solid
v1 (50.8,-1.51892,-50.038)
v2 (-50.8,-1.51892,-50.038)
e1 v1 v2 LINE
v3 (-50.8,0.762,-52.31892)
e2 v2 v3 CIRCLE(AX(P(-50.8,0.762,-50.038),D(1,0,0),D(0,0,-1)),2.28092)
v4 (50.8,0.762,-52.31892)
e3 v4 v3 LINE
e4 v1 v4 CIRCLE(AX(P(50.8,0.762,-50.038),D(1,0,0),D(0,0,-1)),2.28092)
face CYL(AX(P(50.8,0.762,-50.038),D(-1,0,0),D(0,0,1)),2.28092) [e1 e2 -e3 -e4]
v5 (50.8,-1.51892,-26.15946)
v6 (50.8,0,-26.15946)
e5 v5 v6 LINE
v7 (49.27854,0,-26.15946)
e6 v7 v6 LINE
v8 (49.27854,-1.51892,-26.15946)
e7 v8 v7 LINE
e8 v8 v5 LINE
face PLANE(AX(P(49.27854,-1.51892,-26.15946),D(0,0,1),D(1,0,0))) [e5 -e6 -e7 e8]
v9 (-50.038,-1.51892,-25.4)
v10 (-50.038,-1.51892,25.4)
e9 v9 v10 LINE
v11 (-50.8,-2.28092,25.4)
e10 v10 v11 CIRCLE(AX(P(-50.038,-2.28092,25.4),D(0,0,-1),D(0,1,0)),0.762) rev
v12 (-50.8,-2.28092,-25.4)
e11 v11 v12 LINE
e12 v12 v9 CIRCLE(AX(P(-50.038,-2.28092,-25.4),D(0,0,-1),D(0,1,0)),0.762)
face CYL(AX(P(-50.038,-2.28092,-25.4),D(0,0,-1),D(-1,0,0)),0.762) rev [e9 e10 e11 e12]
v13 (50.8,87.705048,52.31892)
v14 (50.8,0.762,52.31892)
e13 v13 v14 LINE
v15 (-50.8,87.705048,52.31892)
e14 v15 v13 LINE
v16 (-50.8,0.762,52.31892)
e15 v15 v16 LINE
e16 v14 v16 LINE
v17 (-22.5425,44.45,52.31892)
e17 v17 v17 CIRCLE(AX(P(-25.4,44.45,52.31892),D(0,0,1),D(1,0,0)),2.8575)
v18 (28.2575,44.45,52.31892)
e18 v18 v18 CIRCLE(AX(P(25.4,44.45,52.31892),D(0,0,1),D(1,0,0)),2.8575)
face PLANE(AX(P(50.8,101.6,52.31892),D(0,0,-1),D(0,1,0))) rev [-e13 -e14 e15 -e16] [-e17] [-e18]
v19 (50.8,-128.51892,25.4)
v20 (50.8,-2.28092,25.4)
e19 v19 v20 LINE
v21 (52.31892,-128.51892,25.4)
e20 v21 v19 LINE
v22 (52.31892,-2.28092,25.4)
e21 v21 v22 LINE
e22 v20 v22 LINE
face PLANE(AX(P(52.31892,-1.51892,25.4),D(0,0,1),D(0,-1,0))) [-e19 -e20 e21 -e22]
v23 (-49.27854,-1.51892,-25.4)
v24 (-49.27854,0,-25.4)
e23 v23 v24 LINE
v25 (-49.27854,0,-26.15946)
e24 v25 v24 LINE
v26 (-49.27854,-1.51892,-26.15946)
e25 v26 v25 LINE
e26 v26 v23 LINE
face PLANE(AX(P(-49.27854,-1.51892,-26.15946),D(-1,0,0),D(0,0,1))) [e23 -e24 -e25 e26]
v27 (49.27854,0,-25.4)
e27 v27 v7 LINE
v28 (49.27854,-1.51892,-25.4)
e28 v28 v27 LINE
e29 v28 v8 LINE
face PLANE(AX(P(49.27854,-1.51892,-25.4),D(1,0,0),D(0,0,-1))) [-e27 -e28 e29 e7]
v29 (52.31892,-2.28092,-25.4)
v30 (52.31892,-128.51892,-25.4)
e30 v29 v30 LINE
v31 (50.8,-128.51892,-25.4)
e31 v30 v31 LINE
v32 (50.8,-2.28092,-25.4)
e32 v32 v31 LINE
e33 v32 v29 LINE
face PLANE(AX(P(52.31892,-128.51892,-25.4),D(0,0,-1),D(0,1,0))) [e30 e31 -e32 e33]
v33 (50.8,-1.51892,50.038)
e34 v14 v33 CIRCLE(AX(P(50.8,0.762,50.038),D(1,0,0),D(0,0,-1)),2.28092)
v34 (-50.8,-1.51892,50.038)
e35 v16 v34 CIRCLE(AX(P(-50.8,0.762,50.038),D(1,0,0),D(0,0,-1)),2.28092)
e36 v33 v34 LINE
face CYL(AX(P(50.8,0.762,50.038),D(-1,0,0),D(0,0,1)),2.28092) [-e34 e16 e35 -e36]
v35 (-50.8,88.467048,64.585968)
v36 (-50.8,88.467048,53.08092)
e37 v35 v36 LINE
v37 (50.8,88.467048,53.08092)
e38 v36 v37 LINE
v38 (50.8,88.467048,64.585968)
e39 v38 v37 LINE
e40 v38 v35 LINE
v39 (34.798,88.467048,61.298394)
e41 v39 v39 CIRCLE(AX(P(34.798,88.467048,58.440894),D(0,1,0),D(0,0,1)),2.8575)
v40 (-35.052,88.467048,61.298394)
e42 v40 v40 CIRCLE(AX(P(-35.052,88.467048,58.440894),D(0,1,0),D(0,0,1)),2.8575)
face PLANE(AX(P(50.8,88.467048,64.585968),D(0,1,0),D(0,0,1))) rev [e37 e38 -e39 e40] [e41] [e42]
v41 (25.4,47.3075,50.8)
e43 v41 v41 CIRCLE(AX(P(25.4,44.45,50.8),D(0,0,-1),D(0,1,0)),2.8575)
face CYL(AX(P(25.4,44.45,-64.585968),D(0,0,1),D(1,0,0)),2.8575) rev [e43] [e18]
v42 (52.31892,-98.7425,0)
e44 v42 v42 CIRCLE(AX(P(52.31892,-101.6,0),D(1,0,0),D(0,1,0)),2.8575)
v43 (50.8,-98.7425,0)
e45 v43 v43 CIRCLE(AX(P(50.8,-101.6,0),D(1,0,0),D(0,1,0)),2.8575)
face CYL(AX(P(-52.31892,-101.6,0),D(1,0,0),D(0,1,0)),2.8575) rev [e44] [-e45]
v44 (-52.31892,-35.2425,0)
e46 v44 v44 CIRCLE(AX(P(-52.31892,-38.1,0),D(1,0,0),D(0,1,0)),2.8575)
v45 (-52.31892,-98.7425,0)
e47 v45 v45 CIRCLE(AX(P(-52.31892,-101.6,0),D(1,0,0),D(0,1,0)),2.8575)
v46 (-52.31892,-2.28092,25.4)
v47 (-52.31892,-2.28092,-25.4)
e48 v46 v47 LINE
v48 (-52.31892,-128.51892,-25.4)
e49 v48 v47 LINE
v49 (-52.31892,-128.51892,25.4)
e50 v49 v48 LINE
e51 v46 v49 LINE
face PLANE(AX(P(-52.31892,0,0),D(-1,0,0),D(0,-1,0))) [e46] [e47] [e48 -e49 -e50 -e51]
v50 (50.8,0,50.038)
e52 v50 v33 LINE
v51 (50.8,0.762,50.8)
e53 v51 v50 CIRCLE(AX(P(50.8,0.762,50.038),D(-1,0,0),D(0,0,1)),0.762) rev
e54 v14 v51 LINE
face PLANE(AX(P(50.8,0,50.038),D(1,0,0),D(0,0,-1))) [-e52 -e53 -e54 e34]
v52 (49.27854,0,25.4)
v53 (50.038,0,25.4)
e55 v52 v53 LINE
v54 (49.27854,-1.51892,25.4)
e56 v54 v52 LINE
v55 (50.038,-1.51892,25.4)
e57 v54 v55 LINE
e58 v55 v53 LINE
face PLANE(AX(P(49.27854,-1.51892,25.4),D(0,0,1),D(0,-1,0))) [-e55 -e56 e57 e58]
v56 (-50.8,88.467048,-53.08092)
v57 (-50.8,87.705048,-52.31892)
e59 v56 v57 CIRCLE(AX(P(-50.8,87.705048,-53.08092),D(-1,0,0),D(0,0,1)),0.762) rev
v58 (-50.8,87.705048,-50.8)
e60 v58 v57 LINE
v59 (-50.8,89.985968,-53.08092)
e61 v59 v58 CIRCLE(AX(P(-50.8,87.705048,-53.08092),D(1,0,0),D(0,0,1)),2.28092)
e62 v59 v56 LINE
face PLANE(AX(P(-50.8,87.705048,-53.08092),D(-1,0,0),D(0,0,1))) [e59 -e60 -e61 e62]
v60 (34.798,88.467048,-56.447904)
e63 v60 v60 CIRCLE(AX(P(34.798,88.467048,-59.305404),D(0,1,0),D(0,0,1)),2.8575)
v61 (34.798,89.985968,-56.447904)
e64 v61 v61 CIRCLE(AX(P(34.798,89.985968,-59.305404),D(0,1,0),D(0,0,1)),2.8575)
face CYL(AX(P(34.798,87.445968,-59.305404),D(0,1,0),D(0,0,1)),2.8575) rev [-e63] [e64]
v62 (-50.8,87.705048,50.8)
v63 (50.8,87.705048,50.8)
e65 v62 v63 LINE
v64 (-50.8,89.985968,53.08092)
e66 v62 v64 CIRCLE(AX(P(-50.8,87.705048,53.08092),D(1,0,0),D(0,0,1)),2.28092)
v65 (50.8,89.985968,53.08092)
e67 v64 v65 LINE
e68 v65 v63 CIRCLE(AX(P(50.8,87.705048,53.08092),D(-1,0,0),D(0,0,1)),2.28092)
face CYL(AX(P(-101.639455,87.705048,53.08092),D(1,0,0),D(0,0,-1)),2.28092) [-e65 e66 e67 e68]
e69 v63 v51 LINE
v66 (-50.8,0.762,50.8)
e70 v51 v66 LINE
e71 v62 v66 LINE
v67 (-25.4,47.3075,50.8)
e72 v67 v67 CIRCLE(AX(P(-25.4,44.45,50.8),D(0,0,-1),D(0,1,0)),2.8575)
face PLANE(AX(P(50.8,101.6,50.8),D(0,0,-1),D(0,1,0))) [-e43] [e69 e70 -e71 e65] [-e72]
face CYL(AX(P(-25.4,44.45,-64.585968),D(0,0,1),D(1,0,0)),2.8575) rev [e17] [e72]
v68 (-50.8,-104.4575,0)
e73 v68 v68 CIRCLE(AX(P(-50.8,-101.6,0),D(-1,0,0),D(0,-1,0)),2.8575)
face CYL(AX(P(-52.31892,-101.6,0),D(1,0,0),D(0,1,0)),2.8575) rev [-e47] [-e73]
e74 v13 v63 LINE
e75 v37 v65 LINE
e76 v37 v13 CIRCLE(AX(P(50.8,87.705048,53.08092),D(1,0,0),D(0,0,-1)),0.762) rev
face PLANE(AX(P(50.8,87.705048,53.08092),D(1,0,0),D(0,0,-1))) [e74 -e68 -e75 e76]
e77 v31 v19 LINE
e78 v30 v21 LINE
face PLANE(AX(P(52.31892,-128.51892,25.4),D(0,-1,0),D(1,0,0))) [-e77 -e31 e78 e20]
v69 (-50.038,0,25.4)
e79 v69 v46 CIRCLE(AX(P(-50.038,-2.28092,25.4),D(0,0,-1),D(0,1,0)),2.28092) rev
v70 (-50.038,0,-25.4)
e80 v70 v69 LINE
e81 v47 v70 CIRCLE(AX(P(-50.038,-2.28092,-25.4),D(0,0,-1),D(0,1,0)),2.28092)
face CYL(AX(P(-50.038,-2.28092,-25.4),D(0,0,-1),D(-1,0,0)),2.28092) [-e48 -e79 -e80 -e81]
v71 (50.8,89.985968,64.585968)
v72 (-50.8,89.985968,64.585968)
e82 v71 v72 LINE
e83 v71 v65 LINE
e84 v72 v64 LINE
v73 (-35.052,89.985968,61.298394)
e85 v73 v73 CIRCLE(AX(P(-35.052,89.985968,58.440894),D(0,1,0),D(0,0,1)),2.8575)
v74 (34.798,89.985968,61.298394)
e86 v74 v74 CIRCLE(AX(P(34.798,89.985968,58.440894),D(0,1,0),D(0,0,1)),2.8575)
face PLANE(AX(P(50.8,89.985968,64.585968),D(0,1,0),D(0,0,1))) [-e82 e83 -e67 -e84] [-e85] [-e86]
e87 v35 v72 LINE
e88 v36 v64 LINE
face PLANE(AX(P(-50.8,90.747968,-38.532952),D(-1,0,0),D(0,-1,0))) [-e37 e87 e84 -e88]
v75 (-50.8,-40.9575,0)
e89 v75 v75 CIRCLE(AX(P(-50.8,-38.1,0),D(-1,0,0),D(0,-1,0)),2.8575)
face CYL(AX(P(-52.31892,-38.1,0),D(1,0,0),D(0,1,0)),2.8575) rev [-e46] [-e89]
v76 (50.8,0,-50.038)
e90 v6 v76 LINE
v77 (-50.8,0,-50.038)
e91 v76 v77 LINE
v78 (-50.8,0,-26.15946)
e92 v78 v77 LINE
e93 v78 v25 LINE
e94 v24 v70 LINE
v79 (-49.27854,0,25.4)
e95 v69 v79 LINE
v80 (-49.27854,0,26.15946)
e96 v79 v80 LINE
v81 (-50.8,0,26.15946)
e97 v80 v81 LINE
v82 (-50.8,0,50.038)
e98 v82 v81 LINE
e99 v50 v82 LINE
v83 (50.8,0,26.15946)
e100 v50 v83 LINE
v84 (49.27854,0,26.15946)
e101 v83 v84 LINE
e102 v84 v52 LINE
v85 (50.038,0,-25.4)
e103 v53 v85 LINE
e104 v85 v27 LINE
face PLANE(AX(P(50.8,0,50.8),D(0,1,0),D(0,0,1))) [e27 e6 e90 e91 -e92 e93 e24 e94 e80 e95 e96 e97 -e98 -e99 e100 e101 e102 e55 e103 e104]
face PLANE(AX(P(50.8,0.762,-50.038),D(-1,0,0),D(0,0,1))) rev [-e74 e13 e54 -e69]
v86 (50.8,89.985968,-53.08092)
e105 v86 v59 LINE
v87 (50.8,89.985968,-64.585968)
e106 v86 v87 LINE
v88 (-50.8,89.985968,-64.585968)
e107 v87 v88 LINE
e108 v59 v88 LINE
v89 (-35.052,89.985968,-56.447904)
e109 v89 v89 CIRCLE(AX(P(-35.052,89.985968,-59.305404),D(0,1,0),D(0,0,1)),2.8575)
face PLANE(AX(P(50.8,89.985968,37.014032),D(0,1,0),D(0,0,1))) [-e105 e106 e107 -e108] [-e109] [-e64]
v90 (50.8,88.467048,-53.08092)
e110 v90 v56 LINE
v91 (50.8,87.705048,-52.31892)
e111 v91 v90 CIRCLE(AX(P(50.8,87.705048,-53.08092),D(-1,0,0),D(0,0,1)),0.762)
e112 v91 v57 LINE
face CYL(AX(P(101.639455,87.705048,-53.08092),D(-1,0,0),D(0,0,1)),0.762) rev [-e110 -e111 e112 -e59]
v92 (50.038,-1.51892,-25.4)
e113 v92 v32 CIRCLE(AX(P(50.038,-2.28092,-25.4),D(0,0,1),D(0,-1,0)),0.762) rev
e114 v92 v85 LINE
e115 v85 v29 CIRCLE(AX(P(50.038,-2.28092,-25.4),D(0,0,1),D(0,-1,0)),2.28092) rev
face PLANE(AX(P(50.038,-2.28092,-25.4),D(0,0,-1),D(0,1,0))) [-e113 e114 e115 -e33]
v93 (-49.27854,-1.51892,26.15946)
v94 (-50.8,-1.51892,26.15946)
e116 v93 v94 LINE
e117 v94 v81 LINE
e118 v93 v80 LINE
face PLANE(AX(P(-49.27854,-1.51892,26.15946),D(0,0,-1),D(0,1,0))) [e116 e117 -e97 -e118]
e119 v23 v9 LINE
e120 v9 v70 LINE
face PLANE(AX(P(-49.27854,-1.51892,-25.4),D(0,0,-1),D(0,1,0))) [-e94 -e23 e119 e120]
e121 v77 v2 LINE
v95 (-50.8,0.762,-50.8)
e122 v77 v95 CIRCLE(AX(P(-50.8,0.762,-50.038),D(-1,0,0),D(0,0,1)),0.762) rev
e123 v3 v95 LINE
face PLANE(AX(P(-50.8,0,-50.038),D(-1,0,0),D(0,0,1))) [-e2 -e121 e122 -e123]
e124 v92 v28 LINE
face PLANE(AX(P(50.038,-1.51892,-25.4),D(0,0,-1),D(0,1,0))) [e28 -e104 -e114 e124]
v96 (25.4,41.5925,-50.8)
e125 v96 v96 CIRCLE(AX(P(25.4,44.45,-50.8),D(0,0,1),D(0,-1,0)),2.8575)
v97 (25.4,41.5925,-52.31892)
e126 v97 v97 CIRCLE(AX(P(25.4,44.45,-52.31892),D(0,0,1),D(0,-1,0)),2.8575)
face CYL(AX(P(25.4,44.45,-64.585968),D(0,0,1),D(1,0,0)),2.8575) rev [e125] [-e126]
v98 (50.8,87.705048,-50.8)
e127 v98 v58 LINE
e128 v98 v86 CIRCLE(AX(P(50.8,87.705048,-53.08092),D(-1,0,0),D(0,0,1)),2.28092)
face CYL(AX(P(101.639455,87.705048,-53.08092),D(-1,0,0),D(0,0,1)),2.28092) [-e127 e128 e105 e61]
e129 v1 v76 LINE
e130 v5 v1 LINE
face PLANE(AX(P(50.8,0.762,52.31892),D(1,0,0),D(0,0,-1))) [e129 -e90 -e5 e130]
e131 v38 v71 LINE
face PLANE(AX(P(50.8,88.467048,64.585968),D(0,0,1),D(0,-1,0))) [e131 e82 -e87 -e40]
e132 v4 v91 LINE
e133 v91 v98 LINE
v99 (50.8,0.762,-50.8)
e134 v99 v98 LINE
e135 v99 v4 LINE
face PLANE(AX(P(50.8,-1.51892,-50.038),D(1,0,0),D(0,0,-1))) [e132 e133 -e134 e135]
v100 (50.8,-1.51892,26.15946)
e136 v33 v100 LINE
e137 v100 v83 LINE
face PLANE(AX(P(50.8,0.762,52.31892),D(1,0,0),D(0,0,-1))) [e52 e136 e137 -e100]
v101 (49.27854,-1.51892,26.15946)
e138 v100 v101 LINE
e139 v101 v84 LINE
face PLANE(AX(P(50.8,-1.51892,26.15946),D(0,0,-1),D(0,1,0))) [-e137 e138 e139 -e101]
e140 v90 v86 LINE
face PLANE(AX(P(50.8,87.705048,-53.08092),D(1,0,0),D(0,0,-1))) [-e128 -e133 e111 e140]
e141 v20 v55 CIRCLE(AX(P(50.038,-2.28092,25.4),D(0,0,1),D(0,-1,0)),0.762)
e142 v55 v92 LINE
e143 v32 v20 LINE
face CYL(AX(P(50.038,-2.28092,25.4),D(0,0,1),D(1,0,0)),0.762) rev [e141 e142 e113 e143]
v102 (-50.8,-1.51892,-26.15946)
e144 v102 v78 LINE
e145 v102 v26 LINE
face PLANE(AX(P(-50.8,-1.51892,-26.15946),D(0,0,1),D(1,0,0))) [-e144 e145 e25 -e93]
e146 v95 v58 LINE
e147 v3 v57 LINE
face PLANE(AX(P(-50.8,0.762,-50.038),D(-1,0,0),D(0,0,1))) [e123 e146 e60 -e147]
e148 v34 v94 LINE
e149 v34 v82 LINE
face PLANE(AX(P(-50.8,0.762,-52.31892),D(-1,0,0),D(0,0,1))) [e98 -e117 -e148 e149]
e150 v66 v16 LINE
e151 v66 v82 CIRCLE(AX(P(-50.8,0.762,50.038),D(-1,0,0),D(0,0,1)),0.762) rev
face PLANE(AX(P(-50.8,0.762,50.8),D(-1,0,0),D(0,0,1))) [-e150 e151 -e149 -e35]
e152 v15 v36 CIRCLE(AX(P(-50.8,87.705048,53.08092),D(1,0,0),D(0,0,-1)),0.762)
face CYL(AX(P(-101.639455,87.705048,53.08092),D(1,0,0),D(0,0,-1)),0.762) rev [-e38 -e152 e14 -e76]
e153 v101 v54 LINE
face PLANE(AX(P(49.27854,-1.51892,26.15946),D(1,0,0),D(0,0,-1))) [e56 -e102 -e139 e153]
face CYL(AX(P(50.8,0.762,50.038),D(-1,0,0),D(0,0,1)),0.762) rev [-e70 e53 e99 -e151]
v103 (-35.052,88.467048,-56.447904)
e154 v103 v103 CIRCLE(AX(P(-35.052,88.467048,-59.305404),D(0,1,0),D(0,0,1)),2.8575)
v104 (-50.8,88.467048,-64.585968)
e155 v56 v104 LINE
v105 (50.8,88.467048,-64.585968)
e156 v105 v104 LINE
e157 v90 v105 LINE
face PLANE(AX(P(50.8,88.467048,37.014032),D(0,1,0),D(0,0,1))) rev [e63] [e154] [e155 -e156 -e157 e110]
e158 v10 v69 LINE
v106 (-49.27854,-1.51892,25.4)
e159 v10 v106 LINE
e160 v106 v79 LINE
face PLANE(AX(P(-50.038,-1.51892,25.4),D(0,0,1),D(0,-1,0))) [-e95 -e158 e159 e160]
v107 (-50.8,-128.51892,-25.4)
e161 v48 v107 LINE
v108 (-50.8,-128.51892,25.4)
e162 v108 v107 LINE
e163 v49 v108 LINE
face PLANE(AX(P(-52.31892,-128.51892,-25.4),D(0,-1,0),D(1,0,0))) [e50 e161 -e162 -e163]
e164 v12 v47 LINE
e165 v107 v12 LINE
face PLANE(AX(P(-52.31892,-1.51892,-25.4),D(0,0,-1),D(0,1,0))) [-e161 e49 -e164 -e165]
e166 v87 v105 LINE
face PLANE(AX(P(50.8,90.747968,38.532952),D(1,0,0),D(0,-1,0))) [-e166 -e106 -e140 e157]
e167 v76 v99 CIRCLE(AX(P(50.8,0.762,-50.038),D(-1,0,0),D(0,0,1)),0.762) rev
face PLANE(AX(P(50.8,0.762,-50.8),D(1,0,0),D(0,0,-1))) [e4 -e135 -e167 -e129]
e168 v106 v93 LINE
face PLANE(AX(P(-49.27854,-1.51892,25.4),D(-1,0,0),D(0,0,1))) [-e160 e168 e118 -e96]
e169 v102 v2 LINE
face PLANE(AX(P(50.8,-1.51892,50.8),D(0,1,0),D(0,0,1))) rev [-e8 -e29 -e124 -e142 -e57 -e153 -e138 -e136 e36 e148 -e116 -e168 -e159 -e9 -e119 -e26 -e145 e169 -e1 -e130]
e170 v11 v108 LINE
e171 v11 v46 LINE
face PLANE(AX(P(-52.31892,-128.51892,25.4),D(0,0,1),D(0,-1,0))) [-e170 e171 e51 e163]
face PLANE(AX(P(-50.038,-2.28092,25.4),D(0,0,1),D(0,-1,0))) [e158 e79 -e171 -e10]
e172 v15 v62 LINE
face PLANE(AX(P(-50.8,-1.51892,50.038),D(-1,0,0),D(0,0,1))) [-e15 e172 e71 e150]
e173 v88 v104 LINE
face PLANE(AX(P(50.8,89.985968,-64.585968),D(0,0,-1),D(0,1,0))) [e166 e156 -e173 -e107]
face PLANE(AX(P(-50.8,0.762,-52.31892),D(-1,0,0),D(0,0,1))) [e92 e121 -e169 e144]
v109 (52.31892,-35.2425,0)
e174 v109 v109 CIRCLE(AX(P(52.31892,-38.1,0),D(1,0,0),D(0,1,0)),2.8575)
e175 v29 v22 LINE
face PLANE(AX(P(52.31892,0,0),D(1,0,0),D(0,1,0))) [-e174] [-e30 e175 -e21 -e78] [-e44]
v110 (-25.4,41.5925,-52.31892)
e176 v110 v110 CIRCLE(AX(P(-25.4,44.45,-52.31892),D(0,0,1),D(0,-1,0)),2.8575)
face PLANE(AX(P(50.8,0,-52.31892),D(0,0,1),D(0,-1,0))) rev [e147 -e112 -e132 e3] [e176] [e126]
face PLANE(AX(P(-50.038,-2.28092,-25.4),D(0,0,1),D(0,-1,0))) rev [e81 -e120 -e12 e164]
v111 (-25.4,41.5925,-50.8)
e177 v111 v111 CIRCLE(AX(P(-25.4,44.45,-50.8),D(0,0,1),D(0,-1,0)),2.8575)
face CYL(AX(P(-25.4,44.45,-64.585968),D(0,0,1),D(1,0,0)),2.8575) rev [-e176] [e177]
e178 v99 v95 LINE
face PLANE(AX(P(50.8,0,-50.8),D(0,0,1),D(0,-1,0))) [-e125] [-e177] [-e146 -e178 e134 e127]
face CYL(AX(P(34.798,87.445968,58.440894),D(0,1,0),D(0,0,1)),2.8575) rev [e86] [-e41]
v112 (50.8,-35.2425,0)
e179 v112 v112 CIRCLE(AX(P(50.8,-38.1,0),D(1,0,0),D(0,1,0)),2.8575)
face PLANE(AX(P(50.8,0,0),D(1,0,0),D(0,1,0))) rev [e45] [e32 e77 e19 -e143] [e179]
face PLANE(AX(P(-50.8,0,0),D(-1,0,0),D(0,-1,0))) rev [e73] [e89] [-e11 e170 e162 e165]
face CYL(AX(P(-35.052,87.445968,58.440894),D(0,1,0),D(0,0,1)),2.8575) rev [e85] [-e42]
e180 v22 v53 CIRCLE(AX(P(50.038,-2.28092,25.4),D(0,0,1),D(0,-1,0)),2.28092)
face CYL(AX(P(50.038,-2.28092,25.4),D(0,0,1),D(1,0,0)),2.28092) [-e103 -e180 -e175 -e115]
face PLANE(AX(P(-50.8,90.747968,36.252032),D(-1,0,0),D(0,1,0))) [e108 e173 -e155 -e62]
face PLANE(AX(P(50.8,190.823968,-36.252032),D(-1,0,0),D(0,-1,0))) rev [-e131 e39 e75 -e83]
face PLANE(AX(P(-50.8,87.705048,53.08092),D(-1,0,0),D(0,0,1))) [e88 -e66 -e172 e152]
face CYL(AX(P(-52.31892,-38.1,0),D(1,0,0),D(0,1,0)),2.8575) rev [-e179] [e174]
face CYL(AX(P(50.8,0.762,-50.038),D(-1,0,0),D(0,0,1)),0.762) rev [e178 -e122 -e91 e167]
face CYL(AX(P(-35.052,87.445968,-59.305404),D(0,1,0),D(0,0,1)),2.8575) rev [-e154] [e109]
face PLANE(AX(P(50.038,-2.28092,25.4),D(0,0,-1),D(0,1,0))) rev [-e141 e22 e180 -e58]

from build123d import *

# Parameters (mm, degrees)
BASE_FLANGE1_DEPTH              = 50.8
EDGE_FLANGE1_STRIP_W            = 7.59968
EDGE_FLANGE1_STRIP_H            = 1.51892
EDGE_FLANGE1_STRIP_CUT_DEPTH    = 50.8
EDGE_FLANGE1_RELIEF_W           = 8.35914
EDGE_FLANGE1_RELIEF_H           = 0.75946
EDGE_FLANGE1_RELIEF_CUT_DEPTH   = 1.51892
EDGE_FLANGE1_STRIP_2_W          = 7.59968
EDGE_FLANGE1_STRIP_2_H          = 1.51892
EDGE_FLANGE1_STRIP_CUT_2_DEPTH  = 50.8
EDGE_FLANGE1_RELIEF_2_W         = 8.35914
EDGE_FLANGE1_RELIEF_2_H         = 0.75946
EDGE_FLANGE1_RELIEF_CUT_2_DEPTH = 1.51892
EDGE_FLANGE1_DEPTH              = 50.8
EDGE_FLANGE1_BEND_DEPTH         = 50.8
SKETCHED_START                  = -50.8
SKETCHED_BEND1_DEPTH            = 101.6
SKETCHED_BEND1_2_DEPTH          = 101.6
SKETCHED_BEND2_DEPTH            = 101.6
SKETCHED_BEND2_2_DEPTH          = 101.6
SKETCH15_R                      = 2.8575
CUT_EXTRUDE1_DEPTH              = 178.869439856
SKETCH17_R                      = 2.8575
CUT_EXTRUDE2_DEPTH              = 2.54
SKETCH18_R                      = 2.8575
CUT_EXTRUDE3_DEPTH              = 182.441822775


# Read off the part's stored shape, not the designer's step: Sketched Bend1, Sketched Bend2
# Sheet-metal steps are written as plain solids
with BuildPart() as part:
    # Sketch2 → Base-Flange1 (new, symmetric)
    with BuildSketch(Plane(origin=(0, 0, 0), x_dir=(0, 0, -1), z_dir=(1, 0, 0))):
        with BuildLine():
            Line((-50.8, 101.6), (-50.8, 0.762))
            ThreePointArc((-50.8, 0.762), (-50.576815367, 0.223184633), (-50.038, 0))
            Line((-50.038, 0), (50.038, 0))
            ThreePointArc((50.038, 0), (50.576815367, 0.223184633), (50.8, 0.762))
            Line((50.8, 0.762), (50.8, 101.6))
            Line((50.8, 101.6), (52.31892, 101.6))
            Line((52.31892, 101.6), (52.31892, 0.762))
            ThreePointArc((52.31892, 0.762), (51.650853999, -0.850853999), (50.038, -1.51892))
            Line((50.038, -1.51892), (-50.038, -1.51892))
            ThreePointArc((-50.038, -1.51892), (-51.650853999, -0.850853999), (-52.31892, 0.762))
            Line((-52.31892, 0.762), (-52.31892, 101.6))
            Line((-52.31892, 101.6), (-50.8, 101.6))
        make_face()
    extrude(amount=BASE_FLANGE1_DEPTH, both=True)

    # Edge-Flange1 strip (across the edge) → Edge-Flange1 strip cut (cut)
    with BuildSketch(Plane(origin=(50.8, -1.51892, -25.4), x_dir=(-1, 0, 0), z_dir=(0, 0, 1))):
        with Locations((-3.03784, -0.75946)):
            Rectangle(EDGE_FLANGE1_STRIP_W, EDGE_FLANGE1_STRIP_H)
    extrude(amount=EDGE_FLANGE1_STRIP_CUT_DEPTH, mode=Mode.SUBTRACT)

    # Edge-Flange1 relief (on the sheet) → Edge-Flange1 relief cut (cut)
    with BuildSketch(Plane(origin=(50.038, -1.51892, -25.4), x_dir=(-1, 0, 0), z_dir=(0, -1, 0))):
        with Locations((-3.42011, 0.37973)):
            Rectangle(EDGE_FLANGE1_RELIEF_W, EDGE_FLANGE1_RELIEF_H)
        with Locations((-3.42011, -51.17973)):
            Rectangle(EDGE_FLANGE1_RELIEF_W, EDGE_FLANGE1_RELIEF_H)
    extrude(amount=-EDGE_FLANGE1_RELIEF_CUT_DEPTH, mode=Mode.SUBTRACT)

    # Edge-Flange1 strip 2 (across the edge) → Edge-Flange1 strip cut 2 (cut)
    with BuildSketch(Plane(origin=(-50.8, -1.51892, 25.4), x_dir=(1, 0, 0), z_dir=(0, 0, -1))):
        with Locations((-3.03784, -0.75946)):
            Rectangle(EDGE_FLANGE1_STRIP_2_W, EDGE_FLANGE1_STRIP_2_H)
    extrude(amount=EDGE_FLANGE1_STRIP_CUT_2_DEPTH, mode=Mode.SUBTRACT)

    # Edge-Flange1 relief 2 (on the sheet) → Edge-Flange1 relief cut 2 (cut)
    with BuildSketch(Plane(origin=(-50.038, -1.51892, 25.4), x_dir=(1, 0, 0), z_dir=(0, -1, 0))):
        with Locations((-3.42011, 0.37973)):
            Rectangle(EDGE_FLANGE1_RELIEF_2_W, EDGE_FLANGE1_RELIEF_2_H)
        with Locations((-3.42011, -51.17973)):
            Rectangle(EDGE_FLANGE1_RELIEF_2_W, EDGE_FLANGE1_RELIEF_2_H)
    extrude(amount=-EDGE_FLANGE1_RELIEF_CUT_2_DEPTH, mode=Mode.SUBTRACT)

    # Edge-Flange1 section (across the edge) → Edge-Flange1 (add)
    with BuildSketch(Plane(origin=(50.8, -1.51892, -25.4), x_dir=(-1, 0, 0), z_dir=(0, 0, 1))):
        with BuildLine():
            Line((-1.51892, 0.762), (-1.51892, 127))
            Line((-1.51892, 127), (0, 127))
            Line((0, 127), (0, 0.762))
            ThreePointArc((0, 0.762), (0.223184633, 0.223184633), (0.762, 0))
            Line((0.762, 0), (0.762, -1.51892))
            ThreePointArc((0.762, -1.51892), (-0.850853999, -0.850853999), (-1.51892, 0.762))
        make_face()
    extrude(amount=EDGE_FLANGE1_DEPTH)

    # Edge-Flange1 section 2 (across the edge) → Edge-Flange1 bend (add)
    with BuildSketch(Plane(origin=(-50.8, -1.51892, 25.4), x_dir=(1, 0, 0), z_dir=(0, 0, -1))):
        with BuildLine():
            Line((-1.51892, 0.762), (-1.51892, 127))
            Line((-1.51892, 127), (0, 127))
            Line((0, 127), (0, 0.762))
            ThreePointArc((0, 0.762), (0.223184633, 0.223184633), (0.762, 0))
            Line((0.762, 0), (0.762, -1.51892))
            ThreePointArc((0.762, -1.51892), (-0.850853999, -0.850853999), (-1.51892, 0.762))
        make_face()
    extrude(amount=EDGE_FLANGE1_BEND_DEPTH)

    # Sketched Bend1 outline → Sketched Bend1 (cut)
    with BuildSketch(Plane.YZ.offset(SKETCHED_START)):
        with BuildLine():
            ThreePointArc((89.854920675, 52.31892), (89.021204447, 51.218038215), (87.70504811, 50.8))
            Line((87.70504811, 50.8), (101.6, 50.8))
            Line((101.6, 50.8), (101.6, 52.31892))
            Line((101.6, 52.31892), (89.854920675, 52.31892))
        make_face()
    extrude(amount=SKETCHED_BEND1_DEPTH, mode=Mode.SUBTRACT)

    # Sketched Bend1 2 outline → Sketched Bend1 2 (add)
    with BuildSketch(Plane.YZ.offset(SKETCHED_START)):
        with BuildLine():
            Line((87.70504811, 52.31892), (89.854920675, 52.31892))
            ThreePointArc((89.854920675, 52.31892), (89.952967523, 52.694326729), (89.98596811, 53.08092))
            Line((89.98596811, 53.08092), (89.98596811, 64.58596811))
            Line((89.98596811, 64.58596811), (88.46704811, 64.58596811))
            Line((88.46704811, 64.58596811), (88.46704811, 53.08092))
            ThreePointArc((88.46704811, 53.08092), (88.243863477, 52.542104633), (87.70504811, 52.31892))
        make_face()
    extrude(amount=SKETCHED_BEND1_2_DEPTH)

    # Sketched Bend2 outline → Sketched Bend2 (cut)
    with BuildSketch(Plane.YZ.offset(SKETCHED_START)):
        with BuildLine():
            ThreePointArc((87.70504811, -50.8), (89.021204447, -51.218038215), (89.854920675, -52.31892))
            Line((89.854920675, -52.31892), (101.6, -52.31892))
            Line((101.6, -52.31892), (101.6, -50.8))
            Line((101.6, -50.8), (87.70504811, -50.8))
        make_face()
    extrude(amount=SKETCHED_BEND2_DEPTH, mode=Mode.SUBTRACT)

    # Sketched Bend2 2 outline → Sketched Bend2 2 (add)
    with BuildSketch(Plane.YZ.offset(SKETCHED_START)):
        with BuildLine():
            Line((88.46704811, -64.58596811), (89.98596811, -64.58596811))
            Line((89.98596811, -64.58596811), (89.98596811, -53.08092))
            ThreePointArc((89.98596811, -53.08092), (89.952967523, -52.694326729), (89.854920675, -52.31892))
            Line((89.854920675, -52.31892), (87.70504811, -52.31892))
            ThreePointArc((87.70504811, -52.31892), (88.243863477, -52.542104633), (88.46704811, -53.08092))
            Line((88.46704811, -53.08092), (88.46704811, -64.58596811))
        make_face()
    extrude(amount=SKETCHED_BEND2_2_DEPTH)

    # Sketch15 → Cut-Extrude1 (cut, through all)
    with BuildSketch(Plane(origin=(52.31892, 0, 0), x_dir=(0, 0, -1), z_dir=(1, 0, 0))):
        with Locations(Location((0, -38.1, 0), (0, 0, 90))):
            Circle(SKETCH15_R)
        with Locations(Location((0, -101.6, 0), (0, 0, 90))):
            Circle(SKETCH15_R)
    extrude(amount=-CUT_EXTRUDE1_DEPTH, mode=Mode.SUBTRACT)

    # Sketch17 → Cut-Extrude2 (cut)
    with BuildSketch(Plane(origin=(0, 89.98596811, 0), x_dir=(1, 0, 0), z_dir=(0, 1, 0))):
        with Locations(Location((-35.052, 59.305404319, 0), (0, 0, 270))):
            Circle(SKETCH17_R)
        with Locations(Location((34.798, 59.305404319, 0), (0, 0, 270))):
            Circle(SKETCH17_R)
        with Locations(Location((-35.052, -58.440894052, 0), (0, 0, 270))):
            Circle(SKETCH17_R)
        with Locations(Location((34.798, -58.440894052, 0), (0, 0, 270))):
            Circle(SKETCH17_R)
    extrude(amount=-CUT_EXTRUDE2_DEPTH, mode=Mode.SUBTRACT)

    # Sketch18 → Cut-Extrude3 (cut, through all)
    with BuildSketch(Plane.XY.offset(52.31892)):
        with Locations((-25.4, 44.45)):
            Circle(SKETCH18_R)
        with Locations((25.4, 44.45)):
            Circle(SKETCH18_R)
    extrude(amount=-CUT_EXTRUDE3_DEPTH, mode=Mode.SUBTRACT)


solid = part.part
